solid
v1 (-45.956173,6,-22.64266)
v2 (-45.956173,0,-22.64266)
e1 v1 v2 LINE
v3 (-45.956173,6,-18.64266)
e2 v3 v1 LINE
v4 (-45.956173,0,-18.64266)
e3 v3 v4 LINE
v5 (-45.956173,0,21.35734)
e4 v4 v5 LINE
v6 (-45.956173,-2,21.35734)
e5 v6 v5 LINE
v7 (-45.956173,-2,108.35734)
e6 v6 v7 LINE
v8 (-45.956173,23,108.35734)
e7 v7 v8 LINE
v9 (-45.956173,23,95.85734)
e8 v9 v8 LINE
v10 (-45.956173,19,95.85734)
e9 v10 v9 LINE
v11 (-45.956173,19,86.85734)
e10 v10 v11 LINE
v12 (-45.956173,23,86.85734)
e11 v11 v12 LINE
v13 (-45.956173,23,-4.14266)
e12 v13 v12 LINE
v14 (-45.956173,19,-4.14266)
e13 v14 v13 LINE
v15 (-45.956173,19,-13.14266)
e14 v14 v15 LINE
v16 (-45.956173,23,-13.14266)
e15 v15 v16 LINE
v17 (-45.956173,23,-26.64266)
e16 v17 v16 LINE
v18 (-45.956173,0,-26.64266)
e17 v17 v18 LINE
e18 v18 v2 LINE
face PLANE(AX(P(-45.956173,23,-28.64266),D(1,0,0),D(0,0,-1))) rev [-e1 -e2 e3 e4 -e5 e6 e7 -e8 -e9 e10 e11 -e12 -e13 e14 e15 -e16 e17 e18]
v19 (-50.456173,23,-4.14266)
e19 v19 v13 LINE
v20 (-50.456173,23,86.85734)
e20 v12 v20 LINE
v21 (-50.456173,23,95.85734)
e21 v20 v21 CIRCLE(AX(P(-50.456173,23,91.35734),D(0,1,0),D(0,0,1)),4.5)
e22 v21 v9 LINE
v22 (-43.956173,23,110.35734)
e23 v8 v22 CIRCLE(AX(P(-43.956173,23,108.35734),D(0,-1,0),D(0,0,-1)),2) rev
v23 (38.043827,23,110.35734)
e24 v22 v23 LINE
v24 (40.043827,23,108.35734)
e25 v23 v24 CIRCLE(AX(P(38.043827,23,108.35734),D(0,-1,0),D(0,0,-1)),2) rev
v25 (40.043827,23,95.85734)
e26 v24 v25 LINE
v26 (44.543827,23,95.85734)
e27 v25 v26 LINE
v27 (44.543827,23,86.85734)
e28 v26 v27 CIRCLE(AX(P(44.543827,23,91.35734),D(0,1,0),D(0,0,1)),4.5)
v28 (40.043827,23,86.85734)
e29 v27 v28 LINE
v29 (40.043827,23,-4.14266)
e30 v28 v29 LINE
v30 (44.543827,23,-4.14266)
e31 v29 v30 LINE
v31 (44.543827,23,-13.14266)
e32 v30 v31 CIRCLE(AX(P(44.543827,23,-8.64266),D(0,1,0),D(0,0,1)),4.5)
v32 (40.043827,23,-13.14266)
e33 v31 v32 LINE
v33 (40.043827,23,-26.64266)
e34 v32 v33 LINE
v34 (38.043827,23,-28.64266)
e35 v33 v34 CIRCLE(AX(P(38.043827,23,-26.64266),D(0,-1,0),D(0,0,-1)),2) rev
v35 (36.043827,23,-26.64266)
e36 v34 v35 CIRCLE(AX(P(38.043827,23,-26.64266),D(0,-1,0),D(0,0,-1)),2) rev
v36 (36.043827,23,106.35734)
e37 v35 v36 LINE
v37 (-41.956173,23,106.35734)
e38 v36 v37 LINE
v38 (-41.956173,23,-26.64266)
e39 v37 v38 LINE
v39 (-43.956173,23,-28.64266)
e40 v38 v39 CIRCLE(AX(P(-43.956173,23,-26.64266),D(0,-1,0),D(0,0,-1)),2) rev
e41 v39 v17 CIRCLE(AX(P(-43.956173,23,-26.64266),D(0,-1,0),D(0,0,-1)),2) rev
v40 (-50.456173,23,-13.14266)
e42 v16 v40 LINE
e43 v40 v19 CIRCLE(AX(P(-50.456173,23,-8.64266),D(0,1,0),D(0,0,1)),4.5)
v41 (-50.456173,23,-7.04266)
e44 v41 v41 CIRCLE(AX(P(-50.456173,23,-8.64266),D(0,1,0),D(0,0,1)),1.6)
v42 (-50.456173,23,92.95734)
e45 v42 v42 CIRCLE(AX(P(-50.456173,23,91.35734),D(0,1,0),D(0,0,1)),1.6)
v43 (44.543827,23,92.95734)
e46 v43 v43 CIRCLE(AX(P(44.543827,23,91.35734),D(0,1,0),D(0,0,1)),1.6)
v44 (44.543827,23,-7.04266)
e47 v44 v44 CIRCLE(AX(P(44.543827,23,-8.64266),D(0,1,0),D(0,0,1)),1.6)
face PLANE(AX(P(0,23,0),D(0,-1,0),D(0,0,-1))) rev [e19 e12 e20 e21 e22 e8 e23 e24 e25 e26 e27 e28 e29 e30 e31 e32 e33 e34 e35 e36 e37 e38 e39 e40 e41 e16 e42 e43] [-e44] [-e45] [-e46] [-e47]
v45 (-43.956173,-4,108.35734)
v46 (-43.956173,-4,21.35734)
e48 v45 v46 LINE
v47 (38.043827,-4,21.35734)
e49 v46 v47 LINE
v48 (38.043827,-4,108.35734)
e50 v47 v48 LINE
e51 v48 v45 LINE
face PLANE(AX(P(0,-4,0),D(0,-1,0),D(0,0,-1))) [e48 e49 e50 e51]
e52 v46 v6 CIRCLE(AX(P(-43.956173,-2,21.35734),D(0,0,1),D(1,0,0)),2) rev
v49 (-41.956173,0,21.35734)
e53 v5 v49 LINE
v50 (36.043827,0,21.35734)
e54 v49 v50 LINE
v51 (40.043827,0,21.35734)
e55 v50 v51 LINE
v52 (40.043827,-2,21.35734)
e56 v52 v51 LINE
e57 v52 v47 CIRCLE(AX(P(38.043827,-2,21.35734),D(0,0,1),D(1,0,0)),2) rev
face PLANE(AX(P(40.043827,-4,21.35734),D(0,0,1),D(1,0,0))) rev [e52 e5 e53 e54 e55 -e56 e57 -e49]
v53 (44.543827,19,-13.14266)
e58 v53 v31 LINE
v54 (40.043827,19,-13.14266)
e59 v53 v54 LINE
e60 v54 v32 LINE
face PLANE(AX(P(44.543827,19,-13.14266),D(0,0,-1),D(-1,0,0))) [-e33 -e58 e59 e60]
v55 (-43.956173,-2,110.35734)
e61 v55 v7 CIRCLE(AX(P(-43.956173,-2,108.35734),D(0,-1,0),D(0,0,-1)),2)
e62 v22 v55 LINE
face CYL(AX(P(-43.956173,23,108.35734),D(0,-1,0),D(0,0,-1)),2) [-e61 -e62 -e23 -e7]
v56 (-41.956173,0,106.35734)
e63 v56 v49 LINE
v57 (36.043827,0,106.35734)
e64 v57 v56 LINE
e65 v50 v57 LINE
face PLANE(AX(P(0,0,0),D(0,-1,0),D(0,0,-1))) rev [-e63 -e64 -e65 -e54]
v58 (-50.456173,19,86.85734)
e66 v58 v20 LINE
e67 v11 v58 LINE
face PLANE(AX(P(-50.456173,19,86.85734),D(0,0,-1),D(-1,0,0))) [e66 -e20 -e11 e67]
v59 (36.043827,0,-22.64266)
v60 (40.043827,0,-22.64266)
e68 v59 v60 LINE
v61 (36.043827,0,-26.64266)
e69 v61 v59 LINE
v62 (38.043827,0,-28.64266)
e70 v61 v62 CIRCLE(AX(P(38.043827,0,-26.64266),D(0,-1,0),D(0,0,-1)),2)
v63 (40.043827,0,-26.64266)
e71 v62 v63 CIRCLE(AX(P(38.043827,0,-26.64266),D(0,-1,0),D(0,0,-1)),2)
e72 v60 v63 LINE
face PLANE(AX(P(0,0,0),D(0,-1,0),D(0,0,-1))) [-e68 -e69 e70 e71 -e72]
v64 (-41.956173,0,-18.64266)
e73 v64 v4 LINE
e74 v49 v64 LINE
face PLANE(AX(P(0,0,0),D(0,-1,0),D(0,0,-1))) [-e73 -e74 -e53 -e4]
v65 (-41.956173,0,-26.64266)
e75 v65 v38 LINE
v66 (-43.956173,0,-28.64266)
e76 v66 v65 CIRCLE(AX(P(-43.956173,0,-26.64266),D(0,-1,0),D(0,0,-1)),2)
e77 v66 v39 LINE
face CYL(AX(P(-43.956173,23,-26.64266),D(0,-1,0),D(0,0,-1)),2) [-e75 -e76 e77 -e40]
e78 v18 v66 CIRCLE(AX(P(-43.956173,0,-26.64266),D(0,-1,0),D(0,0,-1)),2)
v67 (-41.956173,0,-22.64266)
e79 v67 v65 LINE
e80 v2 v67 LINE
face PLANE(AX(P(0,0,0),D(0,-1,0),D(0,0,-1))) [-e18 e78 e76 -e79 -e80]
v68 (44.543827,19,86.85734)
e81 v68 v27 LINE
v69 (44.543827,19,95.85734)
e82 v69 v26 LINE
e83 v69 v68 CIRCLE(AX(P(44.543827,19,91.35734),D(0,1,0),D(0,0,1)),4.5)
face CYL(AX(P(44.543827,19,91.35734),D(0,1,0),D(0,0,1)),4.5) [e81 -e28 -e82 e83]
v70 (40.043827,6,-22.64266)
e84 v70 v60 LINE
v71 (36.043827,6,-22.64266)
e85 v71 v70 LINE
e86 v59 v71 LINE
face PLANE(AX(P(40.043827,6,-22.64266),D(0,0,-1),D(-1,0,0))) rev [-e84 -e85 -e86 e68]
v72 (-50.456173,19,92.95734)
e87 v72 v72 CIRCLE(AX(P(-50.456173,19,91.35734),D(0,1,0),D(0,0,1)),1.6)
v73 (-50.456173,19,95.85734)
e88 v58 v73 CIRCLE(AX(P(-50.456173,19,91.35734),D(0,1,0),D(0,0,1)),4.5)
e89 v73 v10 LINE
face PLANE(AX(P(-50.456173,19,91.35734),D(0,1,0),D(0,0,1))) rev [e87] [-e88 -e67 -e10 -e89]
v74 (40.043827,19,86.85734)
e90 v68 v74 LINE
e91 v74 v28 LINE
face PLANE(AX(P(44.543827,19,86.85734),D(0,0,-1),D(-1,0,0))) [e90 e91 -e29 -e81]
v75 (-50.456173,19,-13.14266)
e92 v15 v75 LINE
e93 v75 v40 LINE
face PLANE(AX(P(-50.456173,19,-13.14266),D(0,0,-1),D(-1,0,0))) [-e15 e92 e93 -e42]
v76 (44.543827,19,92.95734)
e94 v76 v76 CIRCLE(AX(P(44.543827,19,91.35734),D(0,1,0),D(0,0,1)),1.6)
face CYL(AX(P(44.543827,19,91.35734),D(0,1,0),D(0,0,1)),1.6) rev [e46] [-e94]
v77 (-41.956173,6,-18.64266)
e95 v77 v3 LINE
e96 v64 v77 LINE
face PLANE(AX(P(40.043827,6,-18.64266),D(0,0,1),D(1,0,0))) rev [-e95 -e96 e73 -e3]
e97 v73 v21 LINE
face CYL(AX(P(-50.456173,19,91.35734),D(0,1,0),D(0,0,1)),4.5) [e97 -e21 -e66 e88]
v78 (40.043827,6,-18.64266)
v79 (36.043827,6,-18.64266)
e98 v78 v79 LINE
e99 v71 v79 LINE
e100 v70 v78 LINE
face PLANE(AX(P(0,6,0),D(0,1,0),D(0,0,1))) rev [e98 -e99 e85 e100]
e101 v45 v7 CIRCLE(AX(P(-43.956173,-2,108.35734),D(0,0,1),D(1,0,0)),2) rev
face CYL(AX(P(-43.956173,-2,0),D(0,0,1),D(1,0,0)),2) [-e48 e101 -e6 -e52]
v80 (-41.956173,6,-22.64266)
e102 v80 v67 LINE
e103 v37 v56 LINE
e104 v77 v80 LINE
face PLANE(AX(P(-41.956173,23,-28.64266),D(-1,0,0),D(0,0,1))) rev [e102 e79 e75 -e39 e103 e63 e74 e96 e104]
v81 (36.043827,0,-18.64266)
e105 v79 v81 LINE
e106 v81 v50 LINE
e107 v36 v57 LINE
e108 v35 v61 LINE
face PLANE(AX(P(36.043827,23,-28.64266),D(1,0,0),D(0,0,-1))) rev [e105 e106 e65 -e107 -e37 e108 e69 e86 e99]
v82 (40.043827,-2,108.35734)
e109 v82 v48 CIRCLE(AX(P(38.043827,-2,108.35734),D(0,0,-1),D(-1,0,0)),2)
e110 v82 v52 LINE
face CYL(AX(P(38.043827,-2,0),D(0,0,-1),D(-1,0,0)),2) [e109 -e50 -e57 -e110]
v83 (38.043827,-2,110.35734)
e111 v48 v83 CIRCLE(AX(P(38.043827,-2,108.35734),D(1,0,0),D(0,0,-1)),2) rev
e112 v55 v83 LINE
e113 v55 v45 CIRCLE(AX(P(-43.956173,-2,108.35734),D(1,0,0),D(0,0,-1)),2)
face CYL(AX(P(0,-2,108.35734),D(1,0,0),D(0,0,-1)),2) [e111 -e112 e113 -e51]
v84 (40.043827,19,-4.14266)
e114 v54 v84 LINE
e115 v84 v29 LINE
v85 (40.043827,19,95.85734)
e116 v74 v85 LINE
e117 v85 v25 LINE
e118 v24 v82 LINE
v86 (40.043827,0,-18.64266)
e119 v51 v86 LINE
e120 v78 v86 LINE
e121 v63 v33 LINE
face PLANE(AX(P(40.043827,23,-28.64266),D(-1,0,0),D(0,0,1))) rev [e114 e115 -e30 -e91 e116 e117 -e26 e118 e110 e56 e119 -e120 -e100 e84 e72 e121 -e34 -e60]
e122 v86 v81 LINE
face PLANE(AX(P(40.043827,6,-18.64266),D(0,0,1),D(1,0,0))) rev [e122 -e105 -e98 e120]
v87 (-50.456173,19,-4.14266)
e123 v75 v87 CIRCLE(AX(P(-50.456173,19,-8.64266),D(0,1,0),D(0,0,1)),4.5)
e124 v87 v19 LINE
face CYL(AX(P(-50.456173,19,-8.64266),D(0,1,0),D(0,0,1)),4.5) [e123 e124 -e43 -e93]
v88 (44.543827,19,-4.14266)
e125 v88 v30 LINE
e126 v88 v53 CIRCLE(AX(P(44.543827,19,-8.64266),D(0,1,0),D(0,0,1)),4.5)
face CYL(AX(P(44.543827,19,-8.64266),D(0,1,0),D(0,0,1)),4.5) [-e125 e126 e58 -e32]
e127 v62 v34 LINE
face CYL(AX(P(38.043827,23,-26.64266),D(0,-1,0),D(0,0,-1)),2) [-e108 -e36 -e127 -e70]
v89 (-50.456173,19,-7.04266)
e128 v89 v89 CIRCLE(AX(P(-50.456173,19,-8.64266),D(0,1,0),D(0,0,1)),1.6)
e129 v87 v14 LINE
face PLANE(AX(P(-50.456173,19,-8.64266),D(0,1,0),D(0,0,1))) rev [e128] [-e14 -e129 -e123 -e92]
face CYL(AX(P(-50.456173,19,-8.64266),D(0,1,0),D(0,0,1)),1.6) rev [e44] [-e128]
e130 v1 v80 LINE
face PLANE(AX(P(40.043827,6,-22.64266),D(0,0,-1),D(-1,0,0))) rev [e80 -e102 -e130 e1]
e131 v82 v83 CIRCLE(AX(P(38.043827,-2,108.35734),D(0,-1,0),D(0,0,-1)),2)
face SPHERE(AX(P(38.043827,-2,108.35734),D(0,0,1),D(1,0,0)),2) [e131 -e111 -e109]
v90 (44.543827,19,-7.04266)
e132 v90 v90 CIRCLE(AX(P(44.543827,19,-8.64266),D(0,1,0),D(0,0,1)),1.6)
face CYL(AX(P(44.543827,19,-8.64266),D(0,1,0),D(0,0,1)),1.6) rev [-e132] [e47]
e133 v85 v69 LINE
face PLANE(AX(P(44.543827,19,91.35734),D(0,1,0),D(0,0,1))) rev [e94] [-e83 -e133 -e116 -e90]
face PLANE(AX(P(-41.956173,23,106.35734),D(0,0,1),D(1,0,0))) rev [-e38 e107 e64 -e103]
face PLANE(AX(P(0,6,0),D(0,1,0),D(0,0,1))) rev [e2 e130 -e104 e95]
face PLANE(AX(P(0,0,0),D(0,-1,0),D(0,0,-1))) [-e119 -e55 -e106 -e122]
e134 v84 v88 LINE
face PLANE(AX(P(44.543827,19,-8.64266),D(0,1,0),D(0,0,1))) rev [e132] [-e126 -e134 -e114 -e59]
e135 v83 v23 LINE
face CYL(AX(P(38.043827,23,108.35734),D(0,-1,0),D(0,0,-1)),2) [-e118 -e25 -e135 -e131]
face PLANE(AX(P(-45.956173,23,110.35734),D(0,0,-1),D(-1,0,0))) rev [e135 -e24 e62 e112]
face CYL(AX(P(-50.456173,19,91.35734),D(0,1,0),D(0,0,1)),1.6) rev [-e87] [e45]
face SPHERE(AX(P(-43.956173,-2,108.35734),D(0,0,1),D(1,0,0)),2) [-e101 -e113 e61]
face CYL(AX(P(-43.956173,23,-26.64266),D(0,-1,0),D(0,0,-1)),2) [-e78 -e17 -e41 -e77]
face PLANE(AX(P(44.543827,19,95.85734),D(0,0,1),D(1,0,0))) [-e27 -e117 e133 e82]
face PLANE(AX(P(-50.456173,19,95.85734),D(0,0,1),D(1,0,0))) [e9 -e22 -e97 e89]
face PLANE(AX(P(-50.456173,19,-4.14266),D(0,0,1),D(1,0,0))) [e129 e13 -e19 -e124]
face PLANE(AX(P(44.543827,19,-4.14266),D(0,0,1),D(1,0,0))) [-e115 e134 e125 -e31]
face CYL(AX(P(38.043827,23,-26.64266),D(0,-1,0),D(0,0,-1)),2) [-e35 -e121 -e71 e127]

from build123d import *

# Parameters (mm, degrees)
BOSS_EXTRUDE3_DEPTH = 23
SKETCH5_W           = 86
SKETCH5_H           = 89
BOSS_EXTRUDE4_DEPTH = 4
SKETCH7_W           = 86
SKETCH7_H           = 4
CUT_EXTRUDE2_DEPTH  = 6
FILLET2_R           = 2
FILLET3_R           = 2
SKETCH8_R           = 1.6
BOSS_EXTRUDE5_DEPTH = 4
FILLET4_R           = 2


# Some blends are built 0.0001 mm under size
with BuildPart() as part:
    # Sketch2 → Boss-Extrude3 (new body)
    with BuildSketch(Plane(origin=(0, 0, 0), x_dir=(1, 0, 0), z_dir=(0, 1, 0))):
        Polygon((-45.956172868, 28.642659602), (-45.956172868, -110.357340398), (40.043827132, -110.357340398), (40.043827132, 28.642659602), (36.043827132, 28.642659602), (36.043827132, -106.357340398), (-41.956172868, -106.357340398), (-41.956172868, 28.642659602), align=None)
    extrude(amount=BOSS_EXTRUDE3_DEPTH)

    # Sketch5 → Boss-Extrude4 (add)
    with BuildSketch(Plane.XZ):
        with Locations((-2.956172868, 65.857340398)):
            Rectangle(SKETCH5_W, SKETCH5_H)
    extrude(amount=BOSS_EXTRUDE4_DEPTH)

    # Sketch7 → Cut-Extrude2 (cut)
    with BuildSketch(Plane.XZ):
        with Locations((-2.956172868, -20.642659602)):
            Rectangle(SKETCH7_W, SKETCH7_H)
    extrude(amount=-CUT_EXTRUDE2_DEPTH, mode=Mode.SUBTRACT)

    # Fillet2
    fillet2_edges = [part.edges().sort_by_distance(p)[0] for p in [
        (40.043827132, -4, 65.857340398),
        (-2.956172868, -4, 110.357340398),
        (-45.956172868, -4, 65.857340398),
    ]]
    fillet(fillet2_edges, radius=FILLET2_R)

    # Fillet3
    # the kernel refuses this fillet: 2 mm, written as the material it takes off along each edge
    with BuildSketch(Plane(origin=(38.043827132, -2, 108.357340398), x_dir=(1, 0, 0), z_dir=(0, 0, 1))) as fillet3_piece_1_section:
        Polygon((0, 0), (FILLET3_R, 0), (FILLET3_R, -FILLET3_R), (0, -FILLET3_R), align=None)
    fillet3_piece_1 = extrude(amount=FILLET3_R, mode=Mode.PRIVATE)
    fillet3_piece_1 = fillet3_piece_1 - Plane(origin=(38.043827132, -2, 108.357340398), x_dir=(-0.7071067811865475, 0.7071067811865475, 0), z_dir=(0, 0, 1)) * Sphere(FILLET3_R, mode=Mode.PRIVATE)
    add(fillet3_piece_1, mode=Mode.SUBTRACT)
    with BuildSketch(Plane(origin=(-43.956172868, -2, 108.357340398), x_dir=(0, 0, 1), z_dir=(-1, 0, 0))) as fillet3_piece_2_section:
        Polygon((0, 0), (FILLET3_R, 0), (FILLET3_R, -FILLET3_R), (0, -FILLET3_R), align=None)
    fillet3_piece_2 = extrude(amount=FILLET3_R, mode=Mode.PRIVATE)
    fillet3_piece_2 = fillet3_piece_2 - Plane(origin=(-43.956172868, -2, 108.357340398), x_dir=(0, 0.7071067811865475, -0.7071067811865475), z_dir=(-1, 0, 0)) * Sphere(FILLET3_R, mode=Mode.PRIVATE)
    add(fillet3_piece_2, mode=Mode.SUBTRACT)
    with BuildSketch(Plane(origin=(-41.956172868, -5, -28.642659602), x_dir=(-1, 0, 0), z_dir=(0, 1, 0)), Plane(origin=(-45.956172868, -5, -28.642659602), x_dir=(0, 0, 1), z_dir=(0, 1, 0))) as fillet3_piece_3:
        with BuildLine():
            CenterArc((FILLET3_R, FILLET3_R), FILLET3_R, 180, 90)
            Line((0, FILLET3_R), (0, 0))
            Line((0, 0), (FILLET3_R, 0))
        make_face()
    extrude(amount=33, mode=Mode.SUBTRACT)
    with BuildSketch(Plane(origin=(40.043827132, -2, 110.357340398), x_dir=(-1, 0, 0), z_dir=(0, 1, 0)), Plane(origin=(-45.956172868, -2, 110.357340398), x_dir=(0, 0, -1), z_dir=(0, 1, 0))) as fillet3_piece_4:
        with BuildLine():
            CenterArc((FILLET3_R, -FILLET3_R), FILLET3_R, 90, 90)
            Line((0, -FILLET3_R), (0, 0))
            Line((0, 0), (FILLET3_R, 0))
        make_face()
    extrude(amount=30, mode=Mode.SUBTRACT)

    # Sketch8 → Boss-Extrude5 (add)
    # profile 1 of 4: a face of its own
    with BuildSketch(Plane(origin=(0, 23, 0), x_dir=(1, 0, 0), z_dir=(0, 1, 0))):
        with BuildLine():
            Line((40.043827132, -95.857340398), (40.043827132, -86.857340398))
            Line((40.043827132, -86.857340398), (44.543827132, -86.857340398))
            ThreePointArc((44.543827132, -86.857340398), (49.043827132, -91.357340398), (44.543827132, -95.857340398))
            Line((44.543827132, -95.857340398), (40.043827132, -95.857340398))
        make_face()
        with Locations(Location((44.543827132, -91.357340398, 0), (0, 0, 270))):
            Circle(SKETCH8_R, mode=Mode.SUBTRACT)
    # profile 2 of 4: a face of its own
    with BuildSketch(Plane(origin=(0, 23, 0), x_dir=(1, 0, 0), z_dir=(0, 1, 0))):
        with BuildLine():
            Line((-50.456172868, 13.142659602), (-45.956172868, 13.142659602))
            Line((-45.956172868, 13.142659602), (-45.956172868, 4.142659602))
            Line((-45.956172868, 4.142659602), (-50.456172868, 4.142659602))
            ThreePointArc((-50.456172868, 4.142659602), (-54.956172868, 8.642659602), (-50.456172868, 13.142659602))
        make_face()
        with Locations(Location((-50.456172868, 8.642659602, 0), (0, 0, 270))):
            Circle(SKETCH8_R, mode=Mode.SUBTRACT)
    # profile 3 of 4: a face of its own
    with BuildSketch(Plane(origin=(0, 23, 0), x_dir=(1, 0, 0), z_dir=(0, 1, 0))):
        with BuildLine():
            Line((44.543827132, 13.142659602), (40.043827132, 13.142659602))
            Line((40.043827132, 13.142659602), (40.043827132, 4.142659602))
            Line((40.043827132, 4.142659602), (44.543827132, 4.142659602))
            ThreePointArc((44.543827132, 4.142659602), (49.043827132, 8.642659602), (44.543827132, 13.142659602))
        make_face()
        with Locations(Location((44.543827132, 8.642659602, 0), (0, 0, 270))):
            Circle(SKETCH8_R, mode=Mode.SUBTRACT)
    # profile 4 of 4: a face of its own
    with BuildSketch(Plane(origin=(0, 23, 0), x_dir=(1, 0, 0), z_dir=(0, 1, 0))):
        with BuildLine():
            Line((-50.456172868, -86.857340398), (-45.956172868, -86.857340398))
            Line((-45.956172868, -86.857340398), (-45.956172868, -95.857340398))
            Line((-45.956172868, -95.857340398), (-50.456172868, -95.857340398))
            ThreePointArc((-50.456172868, -95.857340398), (-54.956172868, -91.357340398), (-50.456172868, -86.857340398))
        make_face()
        with Locations(Location((-50.456172868, -91.357340398, 0), (0, 0, 270))):
            Circle(SKETCH8_R, mode=Mode.SUBTRACT)
    extrude(amount=-BOSS_EXTRUDE5_DEPTH)

    # Fillet4
    fillet4_edges = [part.edges().sort_by_distance(p)[0] for p in [
        (40.043827132, 11.5, -28.642659602),
        (36.043827132, 11.5, -28.642659602),
    ]]
    fillet(fillet4_edges, radius=FILLET4_R - 0.0001)  # a hair under: the kernel refuses the full size


solid = part.part
